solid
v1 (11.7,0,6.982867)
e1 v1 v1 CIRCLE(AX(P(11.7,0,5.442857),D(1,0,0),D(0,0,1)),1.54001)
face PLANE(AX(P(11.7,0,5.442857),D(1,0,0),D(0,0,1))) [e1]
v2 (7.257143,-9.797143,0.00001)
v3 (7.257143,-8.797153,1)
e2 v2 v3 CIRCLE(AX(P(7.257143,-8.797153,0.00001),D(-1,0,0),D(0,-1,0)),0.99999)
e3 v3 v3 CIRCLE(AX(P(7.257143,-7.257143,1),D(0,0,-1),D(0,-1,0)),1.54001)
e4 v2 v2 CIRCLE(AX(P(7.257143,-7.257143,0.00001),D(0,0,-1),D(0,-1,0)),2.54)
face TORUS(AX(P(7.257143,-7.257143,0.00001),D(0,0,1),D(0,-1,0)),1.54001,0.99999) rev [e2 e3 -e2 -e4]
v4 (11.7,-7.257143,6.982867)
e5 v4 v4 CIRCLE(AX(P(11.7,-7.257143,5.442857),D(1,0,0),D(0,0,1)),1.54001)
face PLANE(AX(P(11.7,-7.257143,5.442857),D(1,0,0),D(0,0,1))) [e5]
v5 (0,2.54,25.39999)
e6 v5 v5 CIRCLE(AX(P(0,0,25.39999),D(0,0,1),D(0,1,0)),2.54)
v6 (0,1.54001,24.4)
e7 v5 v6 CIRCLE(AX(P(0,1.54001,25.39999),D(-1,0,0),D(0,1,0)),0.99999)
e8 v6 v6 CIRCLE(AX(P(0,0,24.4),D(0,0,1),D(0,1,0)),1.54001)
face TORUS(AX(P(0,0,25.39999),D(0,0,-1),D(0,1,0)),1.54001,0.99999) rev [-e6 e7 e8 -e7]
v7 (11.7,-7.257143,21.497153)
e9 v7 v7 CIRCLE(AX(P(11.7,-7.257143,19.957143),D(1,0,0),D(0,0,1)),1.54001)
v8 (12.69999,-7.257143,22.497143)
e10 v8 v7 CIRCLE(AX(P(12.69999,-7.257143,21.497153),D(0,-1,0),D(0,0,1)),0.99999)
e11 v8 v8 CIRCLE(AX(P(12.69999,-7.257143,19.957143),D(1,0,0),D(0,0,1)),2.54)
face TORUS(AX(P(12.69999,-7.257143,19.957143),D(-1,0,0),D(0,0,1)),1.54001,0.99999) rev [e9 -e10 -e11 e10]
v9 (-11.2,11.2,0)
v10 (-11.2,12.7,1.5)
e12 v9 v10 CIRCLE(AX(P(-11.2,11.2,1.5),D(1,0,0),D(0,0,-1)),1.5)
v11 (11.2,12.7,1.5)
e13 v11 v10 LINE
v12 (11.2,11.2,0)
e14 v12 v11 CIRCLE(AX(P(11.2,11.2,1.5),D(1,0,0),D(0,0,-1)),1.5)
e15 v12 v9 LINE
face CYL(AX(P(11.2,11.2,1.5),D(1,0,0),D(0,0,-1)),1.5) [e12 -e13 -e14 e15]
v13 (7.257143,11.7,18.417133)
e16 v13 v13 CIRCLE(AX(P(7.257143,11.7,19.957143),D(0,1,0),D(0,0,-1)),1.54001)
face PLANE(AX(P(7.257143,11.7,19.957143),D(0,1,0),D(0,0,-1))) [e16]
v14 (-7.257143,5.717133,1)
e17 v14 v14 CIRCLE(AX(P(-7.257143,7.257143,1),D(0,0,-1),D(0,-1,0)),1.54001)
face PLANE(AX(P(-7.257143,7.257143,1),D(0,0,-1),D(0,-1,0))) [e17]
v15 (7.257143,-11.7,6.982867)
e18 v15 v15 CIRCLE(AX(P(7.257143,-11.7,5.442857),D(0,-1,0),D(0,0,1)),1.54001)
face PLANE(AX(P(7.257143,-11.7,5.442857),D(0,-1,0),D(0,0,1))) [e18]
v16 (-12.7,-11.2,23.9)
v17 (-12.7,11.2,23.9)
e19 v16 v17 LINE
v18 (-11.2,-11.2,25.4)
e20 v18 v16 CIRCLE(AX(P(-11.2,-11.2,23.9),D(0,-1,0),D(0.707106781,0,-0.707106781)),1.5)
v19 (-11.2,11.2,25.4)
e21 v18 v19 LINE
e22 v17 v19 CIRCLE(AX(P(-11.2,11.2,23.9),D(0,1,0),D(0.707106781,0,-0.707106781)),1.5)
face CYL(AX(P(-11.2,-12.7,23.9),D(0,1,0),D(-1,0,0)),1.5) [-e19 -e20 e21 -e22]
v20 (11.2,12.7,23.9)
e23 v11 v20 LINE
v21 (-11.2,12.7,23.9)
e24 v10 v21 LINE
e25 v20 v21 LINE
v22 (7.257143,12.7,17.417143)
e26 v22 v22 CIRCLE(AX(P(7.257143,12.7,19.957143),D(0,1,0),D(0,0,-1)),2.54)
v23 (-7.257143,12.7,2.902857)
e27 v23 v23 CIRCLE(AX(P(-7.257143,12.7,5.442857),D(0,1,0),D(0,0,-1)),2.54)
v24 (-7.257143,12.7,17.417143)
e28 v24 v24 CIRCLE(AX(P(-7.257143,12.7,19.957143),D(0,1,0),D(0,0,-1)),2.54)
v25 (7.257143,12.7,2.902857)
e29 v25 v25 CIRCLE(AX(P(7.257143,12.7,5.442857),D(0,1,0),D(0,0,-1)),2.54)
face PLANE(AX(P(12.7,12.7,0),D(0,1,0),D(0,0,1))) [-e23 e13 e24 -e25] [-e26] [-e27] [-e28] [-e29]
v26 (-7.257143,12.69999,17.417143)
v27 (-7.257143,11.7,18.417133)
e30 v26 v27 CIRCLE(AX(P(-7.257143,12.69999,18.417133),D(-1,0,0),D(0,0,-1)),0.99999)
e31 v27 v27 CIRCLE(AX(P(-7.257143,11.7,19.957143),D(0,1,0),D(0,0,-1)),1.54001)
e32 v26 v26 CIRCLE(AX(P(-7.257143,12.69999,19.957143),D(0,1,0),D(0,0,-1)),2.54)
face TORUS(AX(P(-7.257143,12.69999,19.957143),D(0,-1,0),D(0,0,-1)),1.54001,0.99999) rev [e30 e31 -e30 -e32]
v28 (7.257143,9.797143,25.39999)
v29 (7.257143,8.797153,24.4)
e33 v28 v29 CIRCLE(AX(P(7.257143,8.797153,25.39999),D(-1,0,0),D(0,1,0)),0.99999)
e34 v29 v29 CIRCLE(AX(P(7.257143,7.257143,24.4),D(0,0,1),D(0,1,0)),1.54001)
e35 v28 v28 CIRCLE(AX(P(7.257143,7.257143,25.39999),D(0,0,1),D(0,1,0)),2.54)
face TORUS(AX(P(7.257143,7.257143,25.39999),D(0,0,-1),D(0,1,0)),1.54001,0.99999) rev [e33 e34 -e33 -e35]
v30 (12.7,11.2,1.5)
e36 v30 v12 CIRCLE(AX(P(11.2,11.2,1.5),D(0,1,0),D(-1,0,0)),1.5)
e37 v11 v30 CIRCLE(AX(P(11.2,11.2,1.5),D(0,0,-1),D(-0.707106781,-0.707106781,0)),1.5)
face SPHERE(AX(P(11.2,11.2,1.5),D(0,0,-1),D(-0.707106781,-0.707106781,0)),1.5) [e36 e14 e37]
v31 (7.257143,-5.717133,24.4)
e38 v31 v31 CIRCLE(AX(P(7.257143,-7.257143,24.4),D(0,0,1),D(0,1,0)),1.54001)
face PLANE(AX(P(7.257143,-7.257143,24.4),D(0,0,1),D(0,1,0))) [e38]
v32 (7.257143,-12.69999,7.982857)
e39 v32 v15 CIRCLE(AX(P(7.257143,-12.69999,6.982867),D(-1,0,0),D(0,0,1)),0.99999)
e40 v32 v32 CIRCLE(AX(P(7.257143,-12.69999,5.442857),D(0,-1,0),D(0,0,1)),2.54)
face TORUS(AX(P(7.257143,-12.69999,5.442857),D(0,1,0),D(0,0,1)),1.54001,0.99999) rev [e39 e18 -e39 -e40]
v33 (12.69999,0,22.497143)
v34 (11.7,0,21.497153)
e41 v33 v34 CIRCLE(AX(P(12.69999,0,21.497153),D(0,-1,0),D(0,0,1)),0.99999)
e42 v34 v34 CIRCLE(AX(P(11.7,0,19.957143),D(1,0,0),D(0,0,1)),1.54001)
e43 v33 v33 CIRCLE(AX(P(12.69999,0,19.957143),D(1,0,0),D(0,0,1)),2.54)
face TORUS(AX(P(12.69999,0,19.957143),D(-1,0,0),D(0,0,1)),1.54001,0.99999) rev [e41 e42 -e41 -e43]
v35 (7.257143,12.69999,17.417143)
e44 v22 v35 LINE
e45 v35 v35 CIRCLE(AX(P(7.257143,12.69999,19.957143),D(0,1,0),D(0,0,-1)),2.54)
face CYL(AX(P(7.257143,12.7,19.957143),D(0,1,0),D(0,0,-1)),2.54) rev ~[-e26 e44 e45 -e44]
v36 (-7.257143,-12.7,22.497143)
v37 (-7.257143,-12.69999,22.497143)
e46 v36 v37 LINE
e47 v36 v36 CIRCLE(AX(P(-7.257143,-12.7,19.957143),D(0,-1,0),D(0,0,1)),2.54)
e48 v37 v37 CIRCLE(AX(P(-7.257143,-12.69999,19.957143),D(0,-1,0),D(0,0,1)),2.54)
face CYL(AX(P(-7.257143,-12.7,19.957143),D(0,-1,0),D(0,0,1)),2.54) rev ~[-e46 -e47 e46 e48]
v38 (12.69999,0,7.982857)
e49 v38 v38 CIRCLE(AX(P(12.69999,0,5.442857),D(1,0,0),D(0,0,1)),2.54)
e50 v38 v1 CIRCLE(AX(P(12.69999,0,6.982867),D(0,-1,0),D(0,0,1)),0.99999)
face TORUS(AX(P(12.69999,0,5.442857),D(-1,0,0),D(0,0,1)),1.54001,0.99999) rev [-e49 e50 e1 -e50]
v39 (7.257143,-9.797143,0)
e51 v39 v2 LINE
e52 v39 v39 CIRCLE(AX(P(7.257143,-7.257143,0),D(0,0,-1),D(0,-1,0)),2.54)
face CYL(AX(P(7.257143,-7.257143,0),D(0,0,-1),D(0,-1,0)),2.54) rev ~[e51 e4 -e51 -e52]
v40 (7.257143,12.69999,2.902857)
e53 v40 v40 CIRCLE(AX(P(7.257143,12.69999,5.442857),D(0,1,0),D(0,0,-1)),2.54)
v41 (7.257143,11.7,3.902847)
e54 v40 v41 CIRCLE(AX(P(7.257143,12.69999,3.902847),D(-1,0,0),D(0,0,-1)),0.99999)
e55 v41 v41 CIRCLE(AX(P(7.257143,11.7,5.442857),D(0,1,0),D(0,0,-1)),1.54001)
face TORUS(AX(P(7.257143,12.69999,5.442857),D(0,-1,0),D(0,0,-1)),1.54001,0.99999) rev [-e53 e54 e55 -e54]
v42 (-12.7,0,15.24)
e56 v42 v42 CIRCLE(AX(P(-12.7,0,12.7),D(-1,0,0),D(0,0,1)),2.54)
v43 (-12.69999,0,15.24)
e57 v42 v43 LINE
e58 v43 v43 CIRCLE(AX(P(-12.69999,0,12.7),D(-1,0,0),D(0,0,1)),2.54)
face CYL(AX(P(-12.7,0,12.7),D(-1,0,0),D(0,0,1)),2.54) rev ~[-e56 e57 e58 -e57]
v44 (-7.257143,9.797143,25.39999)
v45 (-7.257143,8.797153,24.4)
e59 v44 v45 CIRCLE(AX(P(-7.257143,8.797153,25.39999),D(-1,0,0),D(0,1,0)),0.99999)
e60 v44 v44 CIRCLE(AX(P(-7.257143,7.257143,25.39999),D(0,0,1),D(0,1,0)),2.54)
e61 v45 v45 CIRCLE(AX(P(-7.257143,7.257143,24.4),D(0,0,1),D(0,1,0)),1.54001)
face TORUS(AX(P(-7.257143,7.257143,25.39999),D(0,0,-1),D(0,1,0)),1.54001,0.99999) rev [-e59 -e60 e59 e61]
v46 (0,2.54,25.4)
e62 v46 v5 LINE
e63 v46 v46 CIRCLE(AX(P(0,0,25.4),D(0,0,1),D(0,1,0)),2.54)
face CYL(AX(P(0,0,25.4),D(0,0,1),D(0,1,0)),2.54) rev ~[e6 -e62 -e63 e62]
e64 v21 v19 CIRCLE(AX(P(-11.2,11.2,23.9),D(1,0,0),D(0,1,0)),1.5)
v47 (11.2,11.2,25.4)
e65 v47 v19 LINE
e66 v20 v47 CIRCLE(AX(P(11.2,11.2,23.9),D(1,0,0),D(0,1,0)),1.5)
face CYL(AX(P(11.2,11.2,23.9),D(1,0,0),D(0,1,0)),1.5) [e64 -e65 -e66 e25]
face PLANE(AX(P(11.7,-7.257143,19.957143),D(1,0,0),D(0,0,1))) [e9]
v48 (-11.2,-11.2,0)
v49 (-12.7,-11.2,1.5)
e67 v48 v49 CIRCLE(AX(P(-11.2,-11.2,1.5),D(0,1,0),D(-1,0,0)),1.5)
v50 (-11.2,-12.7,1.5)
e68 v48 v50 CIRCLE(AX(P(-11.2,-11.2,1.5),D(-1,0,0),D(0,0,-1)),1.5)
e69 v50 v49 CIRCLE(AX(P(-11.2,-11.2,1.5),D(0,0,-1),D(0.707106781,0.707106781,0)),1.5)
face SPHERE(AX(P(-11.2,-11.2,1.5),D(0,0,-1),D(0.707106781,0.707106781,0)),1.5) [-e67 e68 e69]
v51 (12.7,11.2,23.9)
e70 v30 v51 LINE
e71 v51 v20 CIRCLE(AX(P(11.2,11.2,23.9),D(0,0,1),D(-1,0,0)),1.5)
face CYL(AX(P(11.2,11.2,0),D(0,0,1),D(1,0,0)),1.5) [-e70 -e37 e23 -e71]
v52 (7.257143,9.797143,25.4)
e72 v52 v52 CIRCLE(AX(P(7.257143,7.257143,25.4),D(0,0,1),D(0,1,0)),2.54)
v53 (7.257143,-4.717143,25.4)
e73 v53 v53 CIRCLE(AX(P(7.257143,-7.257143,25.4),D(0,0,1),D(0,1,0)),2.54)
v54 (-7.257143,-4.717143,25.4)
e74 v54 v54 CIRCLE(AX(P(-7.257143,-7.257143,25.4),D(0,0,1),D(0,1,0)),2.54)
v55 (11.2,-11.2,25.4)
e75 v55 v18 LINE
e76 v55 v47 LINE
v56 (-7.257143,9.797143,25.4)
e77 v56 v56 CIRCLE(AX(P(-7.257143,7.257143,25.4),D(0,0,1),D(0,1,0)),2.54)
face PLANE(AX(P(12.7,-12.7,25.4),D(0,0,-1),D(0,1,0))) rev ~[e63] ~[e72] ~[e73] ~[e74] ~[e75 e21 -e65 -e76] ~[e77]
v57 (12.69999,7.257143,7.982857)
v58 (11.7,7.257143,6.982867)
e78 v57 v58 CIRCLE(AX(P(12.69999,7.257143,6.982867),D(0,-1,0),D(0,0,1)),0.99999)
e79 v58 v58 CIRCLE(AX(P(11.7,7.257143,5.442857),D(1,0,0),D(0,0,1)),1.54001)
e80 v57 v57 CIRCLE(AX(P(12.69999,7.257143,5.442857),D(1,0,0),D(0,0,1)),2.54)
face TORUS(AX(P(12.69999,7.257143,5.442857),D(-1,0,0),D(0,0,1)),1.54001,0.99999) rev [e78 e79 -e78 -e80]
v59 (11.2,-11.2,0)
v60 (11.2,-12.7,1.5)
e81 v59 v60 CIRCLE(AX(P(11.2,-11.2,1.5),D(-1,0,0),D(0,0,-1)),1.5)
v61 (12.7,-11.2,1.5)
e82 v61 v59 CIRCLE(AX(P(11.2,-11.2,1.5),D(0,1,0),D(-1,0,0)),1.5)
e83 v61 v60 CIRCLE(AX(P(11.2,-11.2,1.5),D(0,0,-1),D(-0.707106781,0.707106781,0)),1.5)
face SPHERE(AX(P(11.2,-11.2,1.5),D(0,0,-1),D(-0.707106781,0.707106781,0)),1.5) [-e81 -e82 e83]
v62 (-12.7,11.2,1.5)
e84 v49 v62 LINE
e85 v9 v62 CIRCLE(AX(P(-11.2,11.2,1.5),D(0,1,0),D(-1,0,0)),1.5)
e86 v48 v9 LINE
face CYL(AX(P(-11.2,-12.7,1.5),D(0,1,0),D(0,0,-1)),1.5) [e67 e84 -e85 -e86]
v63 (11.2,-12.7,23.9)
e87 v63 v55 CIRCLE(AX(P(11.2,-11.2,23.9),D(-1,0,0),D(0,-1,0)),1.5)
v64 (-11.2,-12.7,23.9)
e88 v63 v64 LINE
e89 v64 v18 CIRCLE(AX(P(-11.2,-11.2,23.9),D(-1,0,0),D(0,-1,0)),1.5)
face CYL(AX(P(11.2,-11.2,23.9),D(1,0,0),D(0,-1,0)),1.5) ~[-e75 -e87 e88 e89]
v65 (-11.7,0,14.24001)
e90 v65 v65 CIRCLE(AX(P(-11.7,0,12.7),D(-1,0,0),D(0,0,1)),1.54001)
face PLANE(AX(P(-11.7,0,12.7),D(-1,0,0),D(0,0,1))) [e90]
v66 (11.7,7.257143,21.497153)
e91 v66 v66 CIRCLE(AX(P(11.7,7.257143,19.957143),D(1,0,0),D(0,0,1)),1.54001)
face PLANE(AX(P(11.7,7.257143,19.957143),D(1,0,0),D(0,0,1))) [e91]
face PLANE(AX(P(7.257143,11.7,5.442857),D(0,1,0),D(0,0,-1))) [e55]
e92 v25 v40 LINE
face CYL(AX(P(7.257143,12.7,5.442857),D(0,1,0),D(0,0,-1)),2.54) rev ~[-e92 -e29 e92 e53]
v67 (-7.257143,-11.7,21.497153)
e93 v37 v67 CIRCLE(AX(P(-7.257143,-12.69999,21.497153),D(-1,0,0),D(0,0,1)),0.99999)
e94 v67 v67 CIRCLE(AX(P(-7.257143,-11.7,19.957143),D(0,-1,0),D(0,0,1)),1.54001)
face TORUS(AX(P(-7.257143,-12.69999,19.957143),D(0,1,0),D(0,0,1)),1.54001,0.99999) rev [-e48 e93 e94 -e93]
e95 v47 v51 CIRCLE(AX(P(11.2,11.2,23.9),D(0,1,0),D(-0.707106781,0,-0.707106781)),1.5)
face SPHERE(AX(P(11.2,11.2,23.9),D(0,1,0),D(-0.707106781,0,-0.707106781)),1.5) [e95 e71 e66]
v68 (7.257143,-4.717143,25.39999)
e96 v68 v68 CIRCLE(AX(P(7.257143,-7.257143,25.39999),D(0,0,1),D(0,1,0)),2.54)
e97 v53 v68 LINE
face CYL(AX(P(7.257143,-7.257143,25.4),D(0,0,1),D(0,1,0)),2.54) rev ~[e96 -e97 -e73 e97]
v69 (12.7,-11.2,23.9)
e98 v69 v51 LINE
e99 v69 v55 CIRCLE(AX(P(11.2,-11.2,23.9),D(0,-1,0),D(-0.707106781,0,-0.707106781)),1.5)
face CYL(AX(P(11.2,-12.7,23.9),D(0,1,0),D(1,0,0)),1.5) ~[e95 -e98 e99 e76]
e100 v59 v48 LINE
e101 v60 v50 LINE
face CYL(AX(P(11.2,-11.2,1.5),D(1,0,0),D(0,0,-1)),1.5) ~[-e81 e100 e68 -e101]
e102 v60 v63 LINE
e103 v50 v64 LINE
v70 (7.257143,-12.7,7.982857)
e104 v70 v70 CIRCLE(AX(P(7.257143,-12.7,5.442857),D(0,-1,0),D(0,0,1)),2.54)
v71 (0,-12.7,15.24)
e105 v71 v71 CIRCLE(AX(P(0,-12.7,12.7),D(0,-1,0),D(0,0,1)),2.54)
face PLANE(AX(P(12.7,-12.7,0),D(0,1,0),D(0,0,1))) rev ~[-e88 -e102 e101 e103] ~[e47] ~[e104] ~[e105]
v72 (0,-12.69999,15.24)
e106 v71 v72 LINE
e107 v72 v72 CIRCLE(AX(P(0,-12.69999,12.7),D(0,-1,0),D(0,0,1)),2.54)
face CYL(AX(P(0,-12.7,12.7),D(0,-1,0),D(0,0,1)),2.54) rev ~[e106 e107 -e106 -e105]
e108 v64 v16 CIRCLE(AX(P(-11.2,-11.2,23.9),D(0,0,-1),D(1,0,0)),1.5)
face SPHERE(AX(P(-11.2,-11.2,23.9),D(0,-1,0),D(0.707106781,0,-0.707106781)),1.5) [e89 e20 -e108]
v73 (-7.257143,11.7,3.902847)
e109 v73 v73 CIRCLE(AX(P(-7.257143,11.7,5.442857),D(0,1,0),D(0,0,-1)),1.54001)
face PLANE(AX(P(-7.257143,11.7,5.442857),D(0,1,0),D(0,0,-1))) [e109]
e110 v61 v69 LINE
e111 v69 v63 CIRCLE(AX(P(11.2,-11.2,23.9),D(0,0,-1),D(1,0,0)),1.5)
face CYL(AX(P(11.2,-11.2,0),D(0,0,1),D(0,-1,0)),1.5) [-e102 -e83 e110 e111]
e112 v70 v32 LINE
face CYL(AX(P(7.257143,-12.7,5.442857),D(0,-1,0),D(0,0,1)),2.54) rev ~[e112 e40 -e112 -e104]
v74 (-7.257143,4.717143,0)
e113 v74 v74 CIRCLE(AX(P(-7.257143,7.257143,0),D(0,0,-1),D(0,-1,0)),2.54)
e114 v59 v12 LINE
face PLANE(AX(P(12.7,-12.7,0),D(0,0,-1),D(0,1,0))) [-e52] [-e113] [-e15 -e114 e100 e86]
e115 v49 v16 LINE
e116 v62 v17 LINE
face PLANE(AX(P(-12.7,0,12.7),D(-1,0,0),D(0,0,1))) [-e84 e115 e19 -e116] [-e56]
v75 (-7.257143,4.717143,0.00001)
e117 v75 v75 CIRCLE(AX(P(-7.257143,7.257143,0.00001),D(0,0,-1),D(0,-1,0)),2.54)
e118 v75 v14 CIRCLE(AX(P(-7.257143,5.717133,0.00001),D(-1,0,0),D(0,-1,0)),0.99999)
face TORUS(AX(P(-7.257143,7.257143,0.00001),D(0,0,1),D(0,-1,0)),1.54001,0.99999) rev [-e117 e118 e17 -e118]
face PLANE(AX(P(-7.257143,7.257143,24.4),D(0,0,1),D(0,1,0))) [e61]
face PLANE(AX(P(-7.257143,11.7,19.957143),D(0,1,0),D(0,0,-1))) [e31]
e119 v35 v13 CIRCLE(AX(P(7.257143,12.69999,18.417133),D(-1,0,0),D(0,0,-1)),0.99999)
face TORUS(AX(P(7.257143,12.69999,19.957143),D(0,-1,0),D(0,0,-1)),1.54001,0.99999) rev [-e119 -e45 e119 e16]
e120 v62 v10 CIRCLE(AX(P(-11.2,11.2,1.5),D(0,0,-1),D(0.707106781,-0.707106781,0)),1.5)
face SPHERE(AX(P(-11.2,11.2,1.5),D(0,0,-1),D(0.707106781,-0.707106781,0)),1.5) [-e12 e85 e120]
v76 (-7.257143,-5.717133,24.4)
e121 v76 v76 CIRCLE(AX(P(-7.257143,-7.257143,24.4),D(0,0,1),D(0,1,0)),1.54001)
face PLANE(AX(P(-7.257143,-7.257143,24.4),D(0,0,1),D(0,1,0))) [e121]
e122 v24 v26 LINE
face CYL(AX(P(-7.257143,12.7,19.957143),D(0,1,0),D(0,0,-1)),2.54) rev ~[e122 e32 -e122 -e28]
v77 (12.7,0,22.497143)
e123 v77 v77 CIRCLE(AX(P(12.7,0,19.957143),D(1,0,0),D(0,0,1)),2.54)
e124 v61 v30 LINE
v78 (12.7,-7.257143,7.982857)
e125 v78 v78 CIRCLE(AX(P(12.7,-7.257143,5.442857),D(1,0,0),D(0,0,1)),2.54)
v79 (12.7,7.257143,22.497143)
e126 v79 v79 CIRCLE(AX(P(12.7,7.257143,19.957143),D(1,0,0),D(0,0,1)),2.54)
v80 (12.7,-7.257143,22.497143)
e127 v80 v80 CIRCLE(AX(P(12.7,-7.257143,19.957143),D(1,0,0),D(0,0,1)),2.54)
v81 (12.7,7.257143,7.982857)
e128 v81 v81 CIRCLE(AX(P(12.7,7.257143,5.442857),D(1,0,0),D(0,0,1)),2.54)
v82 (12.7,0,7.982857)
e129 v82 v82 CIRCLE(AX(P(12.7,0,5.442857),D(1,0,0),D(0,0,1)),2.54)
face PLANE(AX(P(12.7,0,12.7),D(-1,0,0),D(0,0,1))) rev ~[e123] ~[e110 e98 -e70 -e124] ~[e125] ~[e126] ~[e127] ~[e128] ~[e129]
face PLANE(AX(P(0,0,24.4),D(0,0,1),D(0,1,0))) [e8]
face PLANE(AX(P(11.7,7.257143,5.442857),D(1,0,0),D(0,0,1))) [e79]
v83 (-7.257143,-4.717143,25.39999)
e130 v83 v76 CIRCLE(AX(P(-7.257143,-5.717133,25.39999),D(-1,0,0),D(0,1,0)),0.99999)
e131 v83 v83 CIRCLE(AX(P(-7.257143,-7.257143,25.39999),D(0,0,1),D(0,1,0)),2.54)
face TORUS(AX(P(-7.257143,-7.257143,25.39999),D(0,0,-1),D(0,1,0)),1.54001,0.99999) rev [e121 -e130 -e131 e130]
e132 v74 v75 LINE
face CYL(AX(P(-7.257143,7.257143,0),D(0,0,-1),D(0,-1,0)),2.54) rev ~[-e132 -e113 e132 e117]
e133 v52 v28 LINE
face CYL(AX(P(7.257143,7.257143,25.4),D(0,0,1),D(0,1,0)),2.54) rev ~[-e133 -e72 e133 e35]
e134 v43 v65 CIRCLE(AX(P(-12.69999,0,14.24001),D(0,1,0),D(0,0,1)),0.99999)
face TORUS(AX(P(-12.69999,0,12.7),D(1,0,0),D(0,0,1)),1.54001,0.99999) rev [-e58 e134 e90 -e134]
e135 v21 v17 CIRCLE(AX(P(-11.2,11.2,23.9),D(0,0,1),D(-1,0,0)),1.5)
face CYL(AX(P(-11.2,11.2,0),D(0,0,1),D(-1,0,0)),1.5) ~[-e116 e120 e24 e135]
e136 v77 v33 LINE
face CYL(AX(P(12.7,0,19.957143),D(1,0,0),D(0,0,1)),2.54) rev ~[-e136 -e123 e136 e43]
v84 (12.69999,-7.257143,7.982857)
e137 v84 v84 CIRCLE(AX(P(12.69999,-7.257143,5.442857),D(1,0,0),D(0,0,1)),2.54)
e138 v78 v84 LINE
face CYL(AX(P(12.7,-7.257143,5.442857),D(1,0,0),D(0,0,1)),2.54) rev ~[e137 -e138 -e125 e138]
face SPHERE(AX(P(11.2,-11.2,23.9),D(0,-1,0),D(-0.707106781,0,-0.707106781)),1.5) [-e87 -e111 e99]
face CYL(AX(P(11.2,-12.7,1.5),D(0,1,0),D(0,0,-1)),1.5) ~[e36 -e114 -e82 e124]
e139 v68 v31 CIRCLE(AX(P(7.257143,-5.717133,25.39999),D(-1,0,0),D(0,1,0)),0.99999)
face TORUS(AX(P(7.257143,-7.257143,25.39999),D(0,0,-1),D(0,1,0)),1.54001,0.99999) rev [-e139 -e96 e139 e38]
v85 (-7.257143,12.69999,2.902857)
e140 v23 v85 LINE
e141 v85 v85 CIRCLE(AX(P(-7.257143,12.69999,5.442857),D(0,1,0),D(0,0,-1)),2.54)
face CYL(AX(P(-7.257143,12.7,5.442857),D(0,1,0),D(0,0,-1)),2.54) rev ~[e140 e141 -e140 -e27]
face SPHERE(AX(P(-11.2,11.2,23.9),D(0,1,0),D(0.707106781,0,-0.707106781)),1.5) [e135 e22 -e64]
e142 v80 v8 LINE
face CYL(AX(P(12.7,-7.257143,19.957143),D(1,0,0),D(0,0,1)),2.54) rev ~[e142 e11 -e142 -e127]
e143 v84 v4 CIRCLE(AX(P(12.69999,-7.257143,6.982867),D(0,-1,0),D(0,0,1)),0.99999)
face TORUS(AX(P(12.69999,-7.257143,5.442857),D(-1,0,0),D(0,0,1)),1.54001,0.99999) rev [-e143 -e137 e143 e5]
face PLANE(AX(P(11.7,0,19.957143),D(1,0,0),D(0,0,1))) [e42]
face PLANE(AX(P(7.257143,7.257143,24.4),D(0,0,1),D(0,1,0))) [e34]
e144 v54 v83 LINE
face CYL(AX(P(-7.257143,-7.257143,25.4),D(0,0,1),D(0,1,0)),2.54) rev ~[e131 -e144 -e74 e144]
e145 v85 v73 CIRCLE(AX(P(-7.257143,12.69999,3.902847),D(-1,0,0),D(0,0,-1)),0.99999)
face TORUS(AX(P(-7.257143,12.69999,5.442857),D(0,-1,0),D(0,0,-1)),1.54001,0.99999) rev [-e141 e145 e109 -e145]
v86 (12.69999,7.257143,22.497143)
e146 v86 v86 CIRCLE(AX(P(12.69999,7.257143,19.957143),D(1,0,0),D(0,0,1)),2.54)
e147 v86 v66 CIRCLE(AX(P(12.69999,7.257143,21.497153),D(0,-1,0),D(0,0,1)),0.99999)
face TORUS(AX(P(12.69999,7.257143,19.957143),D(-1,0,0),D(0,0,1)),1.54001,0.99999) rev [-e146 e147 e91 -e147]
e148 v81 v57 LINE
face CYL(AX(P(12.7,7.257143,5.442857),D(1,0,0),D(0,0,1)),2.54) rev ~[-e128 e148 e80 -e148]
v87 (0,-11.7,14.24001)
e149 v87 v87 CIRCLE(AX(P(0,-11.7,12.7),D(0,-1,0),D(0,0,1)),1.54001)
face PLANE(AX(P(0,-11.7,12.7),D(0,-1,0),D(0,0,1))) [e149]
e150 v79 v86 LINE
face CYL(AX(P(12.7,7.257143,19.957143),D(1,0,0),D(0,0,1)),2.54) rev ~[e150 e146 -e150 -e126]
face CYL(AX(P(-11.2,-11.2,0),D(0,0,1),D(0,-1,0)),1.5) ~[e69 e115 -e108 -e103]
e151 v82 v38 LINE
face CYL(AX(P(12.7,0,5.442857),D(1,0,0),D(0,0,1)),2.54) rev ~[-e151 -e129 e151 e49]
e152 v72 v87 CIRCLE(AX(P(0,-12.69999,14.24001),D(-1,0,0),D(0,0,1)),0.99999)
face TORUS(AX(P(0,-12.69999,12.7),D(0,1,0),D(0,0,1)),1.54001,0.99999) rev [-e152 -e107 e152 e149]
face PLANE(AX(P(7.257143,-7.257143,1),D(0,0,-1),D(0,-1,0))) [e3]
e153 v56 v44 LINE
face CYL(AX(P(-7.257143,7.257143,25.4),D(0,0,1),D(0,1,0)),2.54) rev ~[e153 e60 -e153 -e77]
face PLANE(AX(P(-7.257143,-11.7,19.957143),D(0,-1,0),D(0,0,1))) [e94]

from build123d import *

# Parameters (mm, degrees)
F2_W          = 25.4
F2_H          = 25.4
F3_DEPTH      = 25.4
F4_R          = 2.54
F10_DEPTH     = 1
F11_R         = 0.99999
F5_R          = 2.54
F12_DEPTH     = 1
F13_R         = 0.99999
F9_R          = 2.54
F14_DEPTH     = 1
F15_R         = 0.99999
F6_R          = 2.54
F16_DEPTH     = 1
F17_R         = 0.99999
F7_R          = 2.54
F18_DEPTH     = 1
F19_R         = 0.99999
F8_R          = 2.54
F20_DEPTH     = 1
F21_R         = 0.99999
F22_R         = 1.5
F23_R         = 1.5
F24_T1_DEPTH  = 22.4
F24_S5_W      = 1.5
F24_S5_H      = 1.5
F24_T6_DEPTH  = 1.5
F24_S11_W     = 1.5
F24_S11_H     = 1.5
F24_T12_DEPTH = 1.5
F24_S17_W     = 1.5
F24_S17_H     = 1.5
F24_T18_DEPTH = 1.5
F24_S23_W     = 1.5
F24_S23_H     = 1.5
F24_T24_DEPTH = 1.5
F24_S29_W     = 1.5
F24_S29_H     = 1.5
F24_T30_DEPTH = 1.5
F24_S35_W     = 1.5
F24_S35_H     = 1.5
F24_T36_DEPTH = 1.5
F24_S41_W     = 1.5
F24_S41_H     = 1.5
F24_T42_DEPTH = 1.5
F24_S47_W     = 1.5
F24_S47_H     = 1.5
F24_T48_DEPTH = 1.5
F27_ANGLE     = 90


# Not quite as in the source:
# - a fillet or chamfer that OpenCascade refuses, or shapes differently, is made with other operations: its cross-section is extruded or revolved along the edge and cut away or added
# - a fillet or chamfer is up to 0.001 mm smaller than in the source, because OpenCascade refuses the exact size


with BuildPart() as f3:
    # F2 (on Top) → F3 (new body)
    with BuildSketch(Plane.XY):
        Rectangle(F2_W, F2_H)
    extrude(amount=F3_DEPTH)

    # F4 (on face) → F10 (cut)
    with BuildSketch(Plane(origin=(0, 0, 0), x_dir=(1, 0, 0), z_dir=(0, 0, -1))):
        with Locations((7.2571428571, 7.2571428571)):
            Circle(F4_R)
        with Locations((7.2571428571, 0)):
            Circle(F4_R)
        with Locations((7.2571428571, -7.2571428571)):
            Circle(F4_R)
        with Locations((-7.2571428571, -7.2571428571)):
            Circle(F4_R)
        with Locations((-7.2571428571, 0)):
            Circle(F4_R)
        with Locations((-7.2571428571, 7.2571428571)):
            Circle(F4_R)
    extrude(amount=-F10_DEPTH, mode=Mode.SUBTRACT)

    # F11 (radius 1 in the source; OpenCascade refuses exactly that, so slightly less here)
    f11_edges = [f3.edges().sort_by_distance(p)[0] for p in [
        (4.717143, 7.257143, 1),
        (-9.797143, 7.257143, 1),
        (4.717143, 0, 1),
        (4.717143, -7.257143, 1),
        (-9.797143, 0, 1),
        (-9.797143, -7.257143, 1),
    ]]
    fillet(f11_edges, radius=F11_R)

    # F5 (on face) → F12 (cut)
    with BuildSketch(Plane.XY.offset(25.4)):
        Circle(F5_R)
    extrude(amount=-F12_DEPTH, mode=Mode.SUBTRACT)

    # F13 (radius 1 in the source; OpenCascade refuses exactly that, so slightly less here)
    f13_edges = [f3.edges().sort_by_distance(p)[0] for p in [
        (-2.54, 0, 24.4),
    ]]
    fillet(f13_edges, radius=F13_R)

    # F9 (on face) → F14 (cut)
    with BuildSketch(Plane.XZ.offset(12.7)):
        with Locations((7.2571428571, 19.9571428571)):
            Circle(F9_R)
        with Locations((0, 12.7)):
            Circle(F9_R)
        with Locations((-7.2571428571, 5.4428571429)):
            Circle(F9_R)
    extrude(amount=-F14_DEPTH, mode=Mode.SUBTRACT)

    # F15 (radius 1 in the source; OpenCascade refuses exactly that, so slightly less here)
    f15_edges = [f3.edges().sort_by_distance(p)[0] for p in [
        (4.717143, -11.7, 19.957143),
        (-2.54, -11.7, 12.7),
        (-9.797143, -11.7, 5.442857),
    ]]
    fillet(f15_edges, radius=F15_R)

    # F6 (on face) → F16 (cut)
    with BuildSketch(Plane.YZ.offset(12.7)):
        with Locations((-7.2571428571, 19.9571428571)):
            Circle(F6_R)
        with Locations((-7.2571428571, 5.4428571429)):
            Circle(F6_R)
        with Locations((7.2571428571, 19.9571428571)):
            Circle(F6_R)
        with Locations((0, 12.7)):
            Circle(F6_R)
        with Locations((7.2571428571, 5.4428571429)):
            Circle(F6_R)
    extrude(amount=-F16_DEPTH, mode=Mode.SUBTRACT)

    # F17 (radius 1 in the source; OpenCascade refuses exactly that, so slightly less here)
    f17_edges = [f3.edges().sort_by_distance(p)[0] for p in [
        (11.7, -9.797143, 5.442857),
        (11.7, -9.797143, 19.957143),
        (11.7, -2.54, 12.7),
        (11.7, 4.717143, 5.442857),
        (11.7, 4.717143, 19.957143),
    ]]
    fillet(f17_edges, radius=F17_R)

    # F7 (on face) → F18 (cut)
    with BuildSketch(Plane(origin=(0, 12.7, 0), x_dir=(-1, 0, 0), z_dir=(0, 1, 0))):
        with Locations((-7.2571428571, 19.9571428571)):
            Circle(F7_R)
        with Locations((-7.2571428571, 5.4428571429)):
            Circle(F7_R)
        with Locations((7.2571428571, 19.9571428571)):
            Circle(F7_R)
        with Locations((7.2571428571, 5.4428571429)):
            Circle(F7_R)
    extrude(amount=-F18_DEPTH, mode=Mode.SUBTRACT)

    # F19 (radius 1 in the source; OpenCascade refuses exactly that, so slightly less here)
    f19_edges = [f3.edges().sort_by_distance(p)[0] for p in [
        (9.797143, 11.7, 5.442857),
        (9.797143, 11.7, 19.957143),
        (-4.717143, 11.7, 19.957143),
        (-4.717143, 11.7, 5.442857),
    ]]
    fillet(f19_edges, radius=F19_R)

    # F8 (on face) → F20 (cut)
    with BuildSketch(Plane(origin=(-12.7, 0, 0), x_dir=(0, -1, 0), z_dir=(-1, 0, 0))):
        with Locations((7.2571428571, 5.4428571429)):
            Circle(F8_R)
        with Locations((-7.2571428571, 19.9571428571)):
            Circle(F8_R)
    extrude(amount=-F20_DEPTH, mode=Mode.SUBTRACT)

    # F21 (radius 1 in the source; OpenCascade refuses exactly that, so slightly less here)
    f21_edges = [f3.edges().sort_by_distance(p)[0] for p in [
        (-11.7, 9.797143, 19.957143),
        (-11.7, -4.717143, 5.442857),
    ]]
    fillet(f21_edges, radius=F21_R)

    # F22
    f22_edges = [f3.edges().sort_by_distance(p)[0] for p in [
        (0, -12.7, 25.4),
        (12.7, 0, 25.4),
        (0, 12.7, 25.4),
        (-12.7, 0, 25.4),
    ]]
    fillet(f22_edges, radius=F22_R)

    # F23
    f23_edges = [f3.edges().sort_by_distance(p)[0] for p in [
        (0, -12.7, 0),
        (12.7, 0, 0),
        (0, 12.7, 0),
        (-12.7, 0, 0),
    ]]
    fillet(f23_edges, radius=F23_R)

    # F24: fillet of radius 1.5 on 4 edges, made by hand

    # F24_s2 → F24_t1 (cut)
    with BuildSketch(Plane.XY.offset(1.5)):
        with BuildLine():
            ThreePointArc((-12.7, -11.2), (-12.2606601718, -12.2606601718), (-11.2, -12.7))
            Line((-11.2, -12.7), (-12.7, -12.7))
            Line((-12.7, -12.7), (-12.7, -11.2))
        make_face()
        with BuildLine():
            ThreePointArc((11.2, -12.7), (12.2606601718, -12.2606601718), (12.7, -11.2))
            Line((12.7, -11.2), (12.7, -12.7))
            Line((12.7, -12.7), (11.2, -12.7))
        make_face()
        with BuildLine():
            ThreePointArc((11.2, 12.7), (12.2606601718, 12.2606601718), (12.7, 11.2))
            Line((12.7, 11.2), (12.7, 12.7))
            Line((12.7, 12.7), (11.2, 12.7))
        make_face()
        with BuildLine():
            ThreePointArc((-12.7, 11.2), (-12.2606601718, 12.2606601718), (-11.2, 12.7))
            Line((-11.2, 12.7), (-12.7, 12.7))
            Line((-12.7, 12.7), (-12.7, 11.2))
        make_face()
    extrude(amount=F24_T1_DEPTH, mode=Mode.SUBTRACT)


with BuildPart() as f24_tool4:
    # F24_s5 → F24_t6 (new body)
    with BuildSketch(Plane.YZ.offset(-11.2)):
        with Locations((11.95, 0.75)):
            Rectangle(F24_S5_W, F24_S5_H)
    extrude(amount=-F24_T6_DEPTH)

    # F24_s7 → F24_t8 (revolve, cut)
    with BuildSketch(Plane(origin=(-11.2, 11.2, 1.5), x_dir=(0, -0.7071067812, 0.7071067812), z_dir=(0, -0.7071067812, -0.7071067812))):
        with BuildLine():
            ThreePointArc((0, -1.5), (1.5, 0), (0, 1.5))
            Line((0, 1.5), (0, -1.5))
        make_face()
    revolve(axis=Axis((-11.2, 11.2, 1.5), (-1, 0, 0)), mode=Mode.SUBTRACT)


with BuildPart() as f3_1:
    add(f3.part)

    # F24_t3: cut F24_tool4
    add(f24_tool4.part, mode=Mode.SUBTRACT)


with BuildPart() as f24_tool10:
    # F24_s11 → F24_t12 (new body)
    with BuildSketch(Plane.YZ.offset(-11.2)):
        with Locations((11.95, 24.65)):
            Rectangle(F24_S11_W, F24_S11_H)
    extrude(amount=-F24_T12_DEPTH)

    # F24_s13 → F24_t14 (revolve, cut)
    with BuildSketch(Plane(origin=(-11.2, 11.2, 23.9), x_dir=(0, -0.7071067812, -0.7071067812), z_dir=(0, 0.7071067812, -0.7071067812))):
        with BuildLine():
            ThreePointArc((0, -1.5), (1.5, 0), (0, 1.5))
            Line((0, 1.5), (0, -1.5))
        make_face()
    revolve(axis=Axis((-11.2, 11.2, 23.9), (-1, 0, 0)), mode=Mode.SUBTRACT)


with BuildPart() as f3_2:
    add(f3_1.part)

    # F24_t9: cut F24_tool10
    add(f24_tool10.part, mode=Mode.SUBTRACT)


with BuildPart() as f24_tool16:
    # F24_s17 → F24_t18 (new body)
    with BuildSketch(Plane.XZ.offset(-11.2)):
        with Locations((11.95, 0.75)):
            Rectangle(F24_S17_W, F24_S17_H)
    extrude(amount=-F24_T18_DEPTH)

    # F24_s19 → F24_t20 (revolve, cut)
    with BuildSketch(Plane(origin=(11.2, 11.2, 1.5), x_dir=(-0.7071067812, 0, 0.7071067812), z_dir=(-0.7071067812, 0, -0.7071067812))):
        with BuildLine():
            ThreePointArc((0, -1.5), (1.5, 0), (0, 1.5))
            Line((0, 1.5), (0, -1.5))
        make_face()
    revolve(axis=Axis((11.2, 11.2, 1.5), (0, 1, 0)), mode=Mode.SUBTRACT)


with BuildPart() as f3_3:
    add(f3_2.part)

    # F24_t15: cut F24_tool16
    add(f24_tool16.part, mode=Mode.SUBTRACT)


with BuildPart() as f24_tool22:
    # F24_s23 → F24_t24 (new body)
    with BuildSketch(Plane.XZ.offset(-11.2)):
        with Locations((11.95, 24.65)):
            Rectangle(F24_S23_W, F24_S23_H)
    extrude(amount=-F24_T24_DEPTH)

    # F24_s25 → F24_t26 (revolve, cut)
    with BuildSketch(Plane(origin=(11.2, 11.2, 23.9), x_dir=(-0.7071067812, 0, -0.7071067812), z_dir=(0.7071067812, 0, -0.7071067812))):
        with BuildLine():
            ThreePointArc((0, -1.5), (1.5, 0), (0, 1.5))
            Line((0, 1.5), (0, -1.5))
        make_face()
    revolve(axis=Axis((11.2, 11.2, 23.9), (0, 1, 0)), mode=Mode.SUBTRACT)


with BuildPart() as f3_4:
    add(f3_3.part)

    # F24_t21: cut F24_tool22
    add(f24_tool22.part, mode=Mode.SUBTRACT)


with BuildPart() as f24_tool28:
    # F24_s29 → F24_t30 (new body)
    with BuildSketch(Plane.XZ.offset(11.2)):
        with Locations((11.95, 0.75)):
            Rectangle(F24_S29_W, F24_S29_H)
    extrude(amount=F24_T30_DEPTH)

    # F24_s31 → F24_t32 (revolve, cut)
    with BuildSketch(Plane(origin=(11.2, -11.2, 1.5), x_dir=(-0.7071067812, 0, 0.7071067812), z_dir=(0.7071067812, 0, 0.7071067812))):
        with BuildLine():
            ThreePointArc((0, -1.5), (1.5, 0), (0, 1.5))
            Line((0, 1.5), (0, -1.5))
        make_face()
    revolve(axis=Axis((11.2, -11.2, 1.5), (0, -1, 0)), mode=Mode.SUBTRACT)


with BuildPart() as f3_5:
    add(f3_4.part)

    # F24_t27: cut F24_tool28
    add(f24_tool28.part, mode=Mode.SUBTRACT)


with BuildPart() as f24_tool34:
    # F24_s35 → F24_t36 (new body)
    with BuildSketch(Plane.XZ.offset(11.2)):
        with Locations((11.95, 24.65)):
            Rectangle(F24_S35_W, F24_S35_H)
    extrude(amount=F24_T36_DEPTH)

    # F24_s37 → F24_t38 (revolve, cut)
    with BuildSketch(Plane(origin=(11.2, -11.2, 23.9), x_dir=(-0.7071067812, 0, -0.7071067812), z_dir=(-0.7071067812, 0, 0.7071067812))):
        with BuildLine():
            ThreePointArc((0, -1.5), (1.5, 0), (0, 1.5))
            Line((0, 1.5), (0, -1.5))
        make_face()
    revolve(axis=Axis((11.2, -11.2, 23.9), (0, -1, 0)), mode=Mode.SUBTRACT)


with BuildPart() as f3_6:
    add(f3_5.part)

    # F24_t33: cut F24_tool34
    add(f24_tool34.part, mode=Mode.SUBTRACT)


with BuildPart() as f24_tool40:
    # F24_s41 → F24_t42 (new body)
    with BuildSketch(Plane.YZ.offset(-11.2)):
        with Locations((-11.95, 0.75)):
            Rectangle(F24_S41_W, F24_S41_H)
    extrude(amount=-F24_T42_DEPTH)

    # F24_s43 → F24_t44 (revolve, cut)
    with BuildSketch(Plane(origin=(-11.2, -11.2, 1.5), x_dir=(0, 0.7071067812, 0.7071067812), z_dir=(0, -0.7071067812, 0.7071067812))):
        with BuildLine():
            ThreePointArc((0, -1.5), (1.5, 0), (0, 1.5))
            Line((0, 1.5), (0, -1.5))
        make_face()
    revolve(axis=Axis((-11.2, -11.2, 1.5), (-1, 0, 0)), mode=Mode.SUBTRACT)


with BuildPart() as f3_7:
    add(f3_6.part)

    # F24_t39: cut F24_tool40
    add(f24_tool40.part, mode=Mode.SUBTRACT)


with BuildPart() as f24_tool46:
    # F24_s47 → F24_t48 (new body)
    with BuildSketch(Plane.YZ.offset(-11.2)):
        with Locations((-11.95, 24.65)):
            Rectangle(F24_S47_W, F24_S47_H)
    extrude(amount=-F24_T48_DEPTH)

    # F24_s49 → F24_t50 (revolve, cut)
    with BuildSketch(Plane(origin=(-11.2, -11.2, 23.9), x_dir=(0, 0.7071067812, -0.7071067812), z_dir=(0, 0.7071067812, 0.7071067812))):
        with BuildLine():
            ThreePointArc((0, -1.5), (1.5, 0), (0, 1.5))
            Line((0, 1.5), (0, -1.5))
        make_face()
    revolve(axis=Axis((-11.2, -11.2, 23.9), (-1, 0, 0)), mode=Mode.SUBTRACT)


with BuildPart() as f3_8:
    add(f3_7.part)

    # F24_t45: cut F24_tool46
    add(f24_tool46.part, mode=Mode.SUBTRACT)


with BuildPart() as f3_9:
    # F27: moved
    add(f3_8.part.rotate(Axis((0, 0, 12.7), (0, -1, 0)), F27_ANGLE))


solid = f3_9.part
